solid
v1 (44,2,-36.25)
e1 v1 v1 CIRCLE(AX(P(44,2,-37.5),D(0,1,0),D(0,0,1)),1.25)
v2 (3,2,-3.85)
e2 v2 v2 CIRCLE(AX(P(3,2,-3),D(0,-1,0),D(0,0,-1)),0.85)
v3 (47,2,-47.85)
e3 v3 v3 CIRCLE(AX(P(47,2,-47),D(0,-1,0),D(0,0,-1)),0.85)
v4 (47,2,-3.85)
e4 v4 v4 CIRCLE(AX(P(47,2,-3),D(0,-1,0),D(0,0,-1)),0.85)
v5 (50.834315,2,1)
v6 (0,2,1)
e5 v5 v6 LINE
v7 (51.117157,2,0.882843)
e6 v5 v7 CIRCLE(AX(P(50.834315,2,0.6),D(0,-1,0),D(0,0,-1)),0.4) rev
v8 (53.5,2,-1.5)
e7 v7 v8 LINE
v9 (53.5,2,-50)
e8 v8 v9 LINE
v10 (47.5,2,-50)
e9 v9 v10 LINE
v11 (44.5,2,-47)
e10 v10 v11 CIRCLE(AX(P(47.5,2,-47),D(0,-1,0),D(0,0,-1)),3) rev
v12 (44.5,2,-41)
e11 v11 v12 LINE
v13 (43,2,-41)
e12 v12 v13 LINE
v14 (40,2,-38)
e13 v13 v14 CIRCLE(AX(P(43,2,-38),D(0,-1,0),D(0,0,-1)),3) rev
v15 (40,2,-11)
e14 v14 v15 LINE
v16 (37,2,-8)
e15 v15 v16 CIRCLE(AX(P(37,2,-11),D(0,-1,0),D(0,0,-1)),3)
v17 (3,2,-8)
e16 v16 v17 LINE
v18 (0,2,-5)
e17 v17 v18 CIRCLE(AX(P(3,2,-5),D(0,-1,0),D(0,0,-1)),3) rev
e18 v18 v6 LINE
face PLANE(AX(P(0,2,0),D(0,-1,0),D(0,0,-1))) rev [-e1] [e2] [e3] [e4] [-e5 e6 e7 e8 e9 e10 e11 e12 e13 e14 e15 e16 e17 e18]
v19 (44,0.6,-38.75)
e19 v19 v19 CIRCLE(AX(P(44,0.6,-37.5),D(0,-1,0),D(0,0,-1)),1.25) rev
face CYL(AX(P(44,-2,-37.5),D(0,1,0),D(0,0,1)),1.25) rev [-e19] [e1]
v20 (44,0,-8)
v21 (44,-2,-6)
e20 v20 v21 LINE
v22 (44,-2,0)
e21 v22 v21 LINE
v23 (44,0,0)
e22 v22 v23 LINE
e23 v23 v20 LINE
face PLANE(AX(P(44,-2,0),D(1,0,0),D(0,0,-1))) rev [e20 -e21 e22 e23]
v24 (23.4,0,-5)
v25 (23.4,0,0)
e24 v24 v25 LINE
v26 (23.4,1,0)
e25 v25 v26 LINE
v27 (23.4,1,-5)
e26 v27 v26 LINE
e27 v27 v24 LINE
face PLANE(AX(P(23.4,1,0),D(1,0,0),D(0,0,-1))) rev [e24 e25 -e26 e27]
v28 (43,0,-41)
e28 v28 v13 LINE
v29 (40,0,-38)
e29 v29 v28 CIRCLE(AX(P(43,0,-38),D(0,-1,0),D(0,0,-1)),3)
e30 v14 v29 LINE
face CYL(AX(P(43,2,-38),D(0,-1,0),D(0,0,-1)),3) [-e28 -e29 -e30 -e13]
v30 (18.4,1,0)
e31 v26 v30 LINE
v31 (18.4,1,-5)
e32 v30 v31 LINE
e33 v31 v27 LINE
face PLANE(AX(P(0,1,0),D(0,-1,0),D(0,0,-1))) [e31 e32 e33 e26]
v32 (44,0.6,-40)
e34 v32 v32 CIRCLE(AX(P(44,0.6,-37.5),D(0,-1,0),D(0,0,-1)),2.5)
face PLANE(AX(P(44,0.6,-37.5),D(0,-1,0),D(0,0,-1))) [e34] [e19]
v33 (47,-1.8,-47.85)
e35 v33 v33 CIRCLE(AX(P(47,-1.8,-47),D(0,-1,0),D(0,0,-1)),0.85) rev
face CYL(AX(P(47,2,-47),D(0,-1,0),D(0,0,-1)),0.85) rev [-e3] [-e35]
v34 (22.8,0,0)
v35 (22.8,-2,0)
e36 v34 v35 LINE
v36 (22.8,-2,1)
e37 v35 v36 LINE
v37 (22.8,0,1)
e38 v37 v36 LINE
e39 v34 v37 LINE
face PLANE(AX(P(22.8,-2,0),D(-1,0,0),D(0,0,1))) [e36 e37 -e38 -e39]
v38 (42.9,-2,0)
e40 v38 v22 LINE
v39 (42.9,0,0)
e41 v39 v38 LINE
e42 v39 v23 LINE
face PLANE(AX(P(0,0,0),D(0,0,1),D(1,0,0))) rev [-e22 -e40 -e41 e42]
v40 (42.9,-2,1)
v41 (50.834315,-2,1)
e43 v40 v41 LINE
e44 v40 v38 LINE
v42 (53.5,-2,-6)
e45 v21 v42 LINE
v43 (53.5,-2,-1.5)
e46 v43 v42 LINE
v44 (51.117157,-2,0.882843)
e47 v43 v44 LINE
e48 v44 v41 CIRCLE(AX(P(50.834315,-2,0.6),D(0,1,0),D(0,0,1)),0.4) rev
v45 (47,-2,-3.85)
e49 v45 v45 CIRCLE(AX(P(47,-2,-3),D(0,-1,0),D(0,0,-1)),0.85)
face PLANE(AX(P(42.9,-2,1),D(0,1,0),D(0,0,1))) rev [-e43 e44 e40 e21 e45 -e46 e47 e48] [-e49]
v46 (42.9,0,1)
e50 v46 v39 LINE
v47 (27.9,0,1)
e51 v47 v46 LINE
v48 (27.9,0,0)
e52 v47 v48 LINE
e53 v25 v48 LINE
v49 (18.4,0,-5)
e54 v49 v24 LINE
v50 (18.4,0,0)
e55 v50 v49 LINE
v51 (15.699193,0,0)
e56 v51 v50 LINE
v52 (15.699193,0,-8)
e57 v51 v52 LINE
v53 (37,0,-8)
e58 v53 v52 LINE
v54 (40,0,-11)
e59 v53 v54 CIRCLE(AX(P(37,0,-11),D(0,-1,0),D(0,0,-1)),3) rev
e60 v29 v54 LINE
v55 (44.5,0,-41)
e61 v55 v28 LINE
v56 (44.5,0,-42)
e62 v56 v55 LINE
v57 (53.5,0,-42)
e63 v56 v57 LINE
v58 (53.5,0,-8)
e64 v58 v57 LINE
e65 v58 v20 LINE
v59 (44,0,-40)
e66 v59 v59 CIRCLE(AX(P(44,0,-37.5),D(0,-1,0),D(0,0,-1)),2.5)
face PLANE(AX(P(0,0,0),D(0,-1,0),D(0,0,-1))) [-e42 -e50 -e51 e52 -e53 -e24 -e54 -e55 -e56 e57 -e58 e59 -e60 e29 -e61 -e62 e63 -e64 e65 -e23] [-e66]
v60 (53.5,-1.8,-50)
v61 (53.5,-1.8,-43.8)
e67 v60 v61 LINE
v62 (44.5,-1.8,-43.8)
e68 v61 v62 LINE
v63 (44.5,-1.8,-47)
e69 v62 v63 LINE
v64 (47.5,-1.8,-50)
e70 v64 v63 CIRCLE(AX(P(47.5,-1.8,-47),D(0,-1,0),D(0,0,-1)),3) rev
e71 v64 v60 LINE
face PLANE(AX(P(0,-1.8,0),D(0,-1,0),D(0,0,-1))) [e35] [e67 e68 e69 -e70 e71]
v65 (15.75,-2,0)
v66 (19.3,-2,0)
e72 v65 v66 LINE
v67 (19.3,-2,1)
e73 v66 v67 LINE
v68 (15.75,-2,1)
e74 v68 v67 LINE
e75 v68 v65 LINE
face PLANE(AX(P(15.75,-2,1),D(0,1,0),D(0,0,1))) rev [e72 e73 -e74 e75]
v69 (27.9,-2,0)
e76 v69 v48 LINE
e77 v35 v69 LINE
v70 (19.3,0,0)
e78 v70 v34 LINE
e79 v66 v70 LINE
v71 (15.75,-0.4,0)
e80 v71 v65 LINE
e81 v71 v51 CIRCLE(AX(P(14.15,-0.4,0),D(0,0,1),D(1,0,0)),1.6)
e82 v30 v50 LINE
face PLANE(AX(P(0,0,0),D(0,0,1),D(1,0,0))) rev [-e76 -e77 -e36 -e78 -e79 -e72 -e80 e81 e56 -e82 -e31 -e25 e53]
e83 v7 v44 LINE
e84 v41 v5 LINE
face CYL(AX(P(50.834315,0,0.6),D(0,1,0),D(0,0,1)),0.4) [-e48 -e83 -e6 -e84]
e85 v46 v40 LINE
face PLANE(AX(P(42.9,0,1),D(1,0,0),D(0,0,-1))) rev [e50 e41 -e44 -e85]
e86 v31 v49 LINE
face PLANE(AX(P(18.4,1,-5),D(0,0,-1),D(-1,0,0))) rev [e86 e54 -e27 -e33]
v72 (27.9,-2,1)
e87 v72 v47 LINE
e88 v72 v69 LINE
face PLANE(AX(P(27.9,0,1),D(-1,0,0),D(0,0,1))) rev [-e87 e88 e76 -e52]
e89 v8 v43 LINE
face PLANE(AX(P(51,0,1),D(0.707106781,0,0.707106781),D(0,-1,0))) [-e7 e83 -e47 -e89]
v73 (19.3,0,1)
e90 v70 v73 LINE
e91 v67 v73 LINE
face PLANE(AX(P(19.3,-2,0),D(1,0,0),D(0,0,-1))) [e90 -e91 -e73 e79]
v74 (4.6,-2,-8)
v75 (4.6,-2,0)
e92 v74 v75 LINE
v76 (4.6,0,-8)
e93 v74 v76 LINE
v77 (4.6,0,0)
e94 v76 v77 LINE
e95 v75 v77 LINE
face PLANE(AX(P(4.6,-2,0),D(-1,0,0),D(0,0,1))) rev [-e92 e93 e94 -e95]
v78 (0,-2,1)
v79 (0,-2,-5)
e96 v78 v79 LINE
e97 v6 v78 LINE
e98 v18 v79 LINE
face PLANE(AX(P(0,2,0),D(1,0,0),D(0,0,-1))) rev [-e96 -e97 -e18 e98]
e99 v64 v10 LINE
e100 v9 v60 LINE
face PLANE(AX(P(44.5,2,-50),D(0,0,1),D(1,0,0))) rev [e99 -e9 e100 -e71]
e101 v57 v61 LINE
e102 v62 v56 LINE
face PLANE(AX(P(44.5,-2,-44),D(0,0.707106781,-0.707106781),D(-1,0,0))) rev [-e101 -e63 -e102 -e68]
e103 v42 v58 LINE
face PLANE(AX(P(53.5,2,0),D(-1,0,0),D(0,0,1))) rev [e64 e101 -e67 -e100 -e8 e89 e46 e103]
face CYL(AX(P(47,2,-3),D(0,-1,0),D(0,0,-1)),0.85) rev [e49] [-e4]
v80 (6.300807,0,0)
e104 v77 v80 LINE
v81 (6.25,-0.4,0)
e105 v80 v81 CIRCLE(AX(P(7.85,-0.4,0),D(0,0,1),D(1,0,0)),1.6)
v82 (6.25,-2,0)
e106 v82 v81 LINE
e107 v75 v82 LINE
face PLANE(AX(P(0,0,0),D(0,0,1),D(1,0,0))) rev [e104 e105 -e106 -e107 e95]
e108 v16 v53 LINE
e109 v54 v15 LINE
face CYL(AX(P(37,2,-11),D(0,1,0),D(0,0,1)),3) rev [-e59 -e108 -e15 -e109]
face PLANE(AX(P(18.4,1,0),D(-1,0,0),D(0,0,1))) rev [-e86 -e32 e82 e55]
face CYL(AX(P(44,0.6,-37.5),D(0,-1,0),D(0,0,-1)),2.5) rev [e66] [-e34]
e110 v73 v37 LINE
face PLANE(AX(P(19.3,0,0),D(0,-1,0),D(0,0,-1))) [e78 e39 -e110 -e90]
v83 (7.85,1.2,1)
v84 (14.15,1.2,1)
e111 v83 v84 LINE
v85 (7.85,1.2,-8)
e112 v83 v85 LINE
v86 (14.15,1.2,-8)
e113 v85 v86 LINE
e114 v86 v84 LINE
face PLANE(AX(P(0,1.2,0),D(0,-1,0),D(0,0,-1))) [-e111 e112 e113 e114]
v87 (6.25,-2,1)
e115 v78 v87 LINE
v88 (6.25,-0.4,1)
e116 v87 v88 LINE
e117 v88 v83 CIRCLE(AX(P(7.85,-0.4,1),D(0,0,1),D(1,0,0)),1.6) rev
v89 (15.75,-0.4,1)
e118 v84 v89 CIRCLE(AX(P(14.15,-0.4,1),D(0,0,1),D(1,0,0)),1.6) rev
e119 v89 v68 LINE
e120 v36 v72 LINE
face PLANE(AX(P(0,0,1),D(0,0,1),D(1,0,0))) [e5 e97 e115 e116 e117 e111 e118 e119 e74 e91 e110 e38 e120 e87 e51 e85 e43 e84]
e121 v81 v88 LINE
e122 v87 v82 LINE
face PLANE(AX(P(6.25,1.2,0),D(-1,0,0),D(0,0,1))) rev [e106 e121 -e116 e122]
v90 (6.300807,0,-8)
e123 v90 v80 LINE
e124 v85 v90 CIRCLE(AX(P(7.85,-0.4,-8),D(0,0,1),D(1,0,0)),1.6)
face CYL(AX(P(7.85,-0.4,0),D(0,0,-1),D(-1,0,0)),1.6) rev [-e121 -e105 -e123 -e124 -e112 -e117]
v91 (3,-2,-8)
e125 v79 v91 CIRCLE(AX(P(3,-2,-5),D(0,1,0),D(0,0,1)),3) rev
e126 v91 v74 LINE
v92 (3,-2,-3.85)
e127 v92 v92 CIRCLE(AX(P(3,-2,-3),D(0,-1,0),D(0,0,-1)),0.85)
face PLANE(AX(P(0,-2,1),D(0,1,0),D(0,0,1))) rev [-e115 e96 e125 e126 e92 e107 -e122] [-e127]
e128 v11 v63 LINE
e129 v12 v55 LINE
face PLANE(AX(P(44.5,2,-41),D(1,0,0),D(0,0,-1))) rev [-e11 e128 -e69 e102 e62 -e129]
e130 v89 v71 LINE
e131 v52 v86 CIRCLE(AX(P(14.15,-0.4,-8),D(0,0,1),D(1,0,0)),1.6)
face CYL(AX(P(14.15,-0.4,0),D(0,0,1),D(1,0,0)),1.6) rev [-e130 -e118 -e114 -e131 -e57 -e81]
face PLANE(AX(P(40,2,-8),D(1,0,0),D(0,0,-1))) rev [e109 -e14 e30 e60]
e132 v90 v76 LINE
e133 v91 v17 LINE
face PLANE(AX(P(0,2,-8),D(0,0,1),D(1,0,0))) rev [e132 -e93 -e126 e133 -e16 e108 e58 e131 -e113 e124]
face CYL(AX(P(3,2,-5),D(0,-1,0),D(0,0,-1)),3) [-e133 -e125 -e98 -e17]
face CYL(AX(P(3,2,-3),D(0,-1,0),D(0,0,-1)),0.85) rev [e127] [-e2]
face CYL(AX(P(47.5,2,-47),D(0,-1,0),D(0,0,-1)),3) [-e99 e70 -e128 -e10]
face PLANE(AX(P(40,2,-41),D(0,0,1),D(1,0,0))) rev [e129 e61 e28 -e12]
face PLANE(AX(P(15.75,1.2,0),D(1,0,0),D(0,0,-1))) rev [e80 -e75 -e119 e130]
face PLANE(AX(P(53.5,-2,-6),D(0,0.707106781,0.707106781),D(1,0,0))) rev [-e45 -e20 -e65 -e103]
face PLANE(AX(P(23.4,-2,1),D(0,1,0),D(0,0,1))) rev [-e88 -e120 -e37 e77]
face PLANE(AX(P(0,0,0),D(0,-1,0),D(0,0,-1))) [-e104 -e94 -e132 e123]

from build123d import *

# Parameters (mm, degrees)
EXTRUDE_1_DEPTH     = 2
SKETCH_3_W          = 9.5
SKETCH_3_H          = 8
CUT_EXTRUDE_1_DEPTH = 1.2
SKETCH_4_W          = 5
SKETCH_4_H          = 5
CUT_EXTRUDE_2_DEPTH = 1
EXTRUDE_2_DEPTH     = 1
FILLET_1_R          = 1.6
SKETCH_6_W          = 9.5
SKETCH_6_H          = 6
SKETCH_6_W_2        = 9
SKETCH_6_W_3        = 4.6
SKETCH_6_H_2        = 8
EXTRUDE_3_DEPTH     = 2
CHAMFER_1_SIZE      = 2.5
CHAMFER_2_SIZE      = 2
FILLET_2_R          = 3
SKETCH_7_R          = 0.85
CUT_EXTRUDE_3_DEPTH = 74.33655296
SKETCH_8_R          = 1.25
CUT_EXTRUDE_4_DEPTH = 74.33655296
SKETCH_9_R          = 2.5
CUT_EXTRUDE_5_DEPTH = 0.6
FILLET_3_R          = 0.4
SKETCH_10_W         = 12.125863774
SKETCH_10_H         = 8.335254798
CUT_EXTRUDE_6_DEPTH = 0.2
EXTRUDE_4_DEPTH     = 1


with BuildPart() as part:
    # 草图2 → 凸台-拉伸1 (new body)
    with BuildSketch(Plane(origin=(0, 0, 0), x_dir=(1, 0, 0), z_dir=(0, 1, 0))):
        Polygon((40, 41), (44.5, 41), (44.5, 50), (53.5, 50), (53.5, 0), (0, 0), (0, 8), (40, 8), align=None)
    extrude(amount=EXTRUDE_1_DEPTH)

    # 草图3 → 切除-拉伸1 (cut)
    with BuildSketch(Plane.XZ):
        with Locations((11, -4)):
            Rectangle(SKETCH_3_W, SKETCH_3_H)
    extrude(amount=-CUT_EXTRUDE_1_DEPTH, mode=Mode.SUBTRACT)

    # 草图4 → 切除-拉伸2 (cut)
    with BuildSketch(Plane.XZ):
        with Locations((20.9, -2.5)):
            Rectangle(SKETCH_4_W, SKETCH_4_H)
    extrude(amount=-CUT_EXTRUDE_2_DEPTH, mode=Mode.SUBTRACT)

    # 草图5 → 凸台-拉伸2 (add)
    with BuildSketch(Plane.XY):
        Polygon((0, 0), (0, -2), (6.25, -2), (6.25, 0), (6.25, 1.2), (15.75, 1.2), (15.75, -2), (18.4, -2), (18.4, 1), (23.4, 1), (23.4, 0), (23.4, -2), (27.9, -2), (27.9, 0), (42.9, 0), (42.9, -2), (53.5, -2), (53.5, 0), (53.5, 2), (0, 2), align=None)
    extrude(amount=EXTRUDE_2_DEPTH)

    # 圆角1
    fillet_1_edges = [part.edges().sort_by_distance(p)[0] for p in [
        (15.75, 1.2, -3.5),
        (6.25, 1.2, -3.5),
    ]]
    fillet(fillet_1_edges, radius=FILLET_1_R)

    # 草图6 → 凸台-拉伸3 (add)
    with BuildSketch(Plane.XZ):
        with Locations((48.75, -3)):
            Rectangle(SKETCH_6_W, SKETCH_6_H)
        with Locations((49, -47)):
            Rectangle(SKETCH_6_W_2, SKETCH_6_H)
        with Locations((2.3, -4)):
            Rectangle(SKETCH_6_W_3, SKETCH_6_H_2)
    extrude(amount=EXTRUDE_3_DEPTH)

    # 倒角1
    chamfer_1_edges = [part.edges().sort_by_distance(p)[0] for p in [
        (53.5, 0, 1),
    ]]
    chamfer(chamfer_1_edges, length=CHAMFER_1_SIZE)

    # 倒角2
    chamfer_2_edges = [part.edges().sort_by_distance(p)[0] for p in [
        (48.75, 0, -6),
        (49, 0, -44),
    ]]
    chamfer(chamfer_2_edges, length=CHAMFER_2_SIZE - 0.0001)  # a hair under: the kernel refuses the full size

    # 圆角2
    fillet_2_edges = [part.edges().sort_by_distance(p)[0] for p in [
        (0, 0, -8),
        (40, 1, -8),
        (40, 1, -41),
        (44.5, 0, -50),
    ]]
    fillet(fillet_2_edges, radius=FILLET_2_R)

    # 草图7 → 切除-拉伸3 (cut, through all)
    with BuildSketch(Plane.XZ.offset(2)):
        with Locations(Location((47, -3, 0), (0, 0, 270))):
            Circle(SKETCH_7_R)
        with Locations(Location((47, -47, 0), (0, 0, 270))):
            Circle(SKETCH_7_R)
        with Locations(Location((3, -3, 0), (0, 0, 270))):
            Circle(SKETCH_7_R)
    extrude(amount=-CUT_EXTRUDE_3_DEPTH, mode=Mode.SUBTRACT)

    # 草图8 → 切除-拉伸4 (cut, through all)
    with BuildSketch(Plane(origin=(0, 2, 0), x_dir=(1, 0, 0), z_dir=(0, 1, 0))):
        with Locations(Location((44, 37.5, 0), (0, 0, 270))):
            Circle(SKETCH_8_R)
    extrude(amount=-CUT_EXTRUDE_4_DEPTH, mode=Mode.SUBTRACT)

    # 草图9 → 切除-拉伸5 (cut)
    with BuildSketch(Plane.XZ):
        with Locations(Location((44, -37.5, 0), (0, 0, 270))):
            Circle(SKETCH_9_R)
    extrude(amount=-CUT_EXTRUDE_5_DEPTH, mode=Mode.SUBTRACT)

    # 圆角3
    fillet_3_edges = [part.edges().sort_by_distance(p)[0] for p in [
        (51, 0, 1),
    ]]
    fillet(fillet_3_edges, radius=FILLET_3_R)

    # 草图10 → 切除-拉伸6 (cut)
    with BuildSketch(Plane.XZ.offset(2)):
        with Locations((49.021088356, -47.204499244)):
            Rectangle(SKETCH_10_W, SKETCH_10_H)
    extrude(amount=-CUT_EXTRUDE_6_DEPTH, mode=Mode.SUBTRACT)

    # 草图11 → 凸台-拉伸4 (add)
    with BuildSketch(Plane.XY.offset(1)):
        Polygon((23.4, 1), (23.4, -2), (22.8, -2), (22.8, 0), (19.3, 0), (19.3, -2), (18.4, -2), (18.4, 1), align=None)
    extrude(amount=-EXTRUDE_4_DEPTH)


solid = part.part
